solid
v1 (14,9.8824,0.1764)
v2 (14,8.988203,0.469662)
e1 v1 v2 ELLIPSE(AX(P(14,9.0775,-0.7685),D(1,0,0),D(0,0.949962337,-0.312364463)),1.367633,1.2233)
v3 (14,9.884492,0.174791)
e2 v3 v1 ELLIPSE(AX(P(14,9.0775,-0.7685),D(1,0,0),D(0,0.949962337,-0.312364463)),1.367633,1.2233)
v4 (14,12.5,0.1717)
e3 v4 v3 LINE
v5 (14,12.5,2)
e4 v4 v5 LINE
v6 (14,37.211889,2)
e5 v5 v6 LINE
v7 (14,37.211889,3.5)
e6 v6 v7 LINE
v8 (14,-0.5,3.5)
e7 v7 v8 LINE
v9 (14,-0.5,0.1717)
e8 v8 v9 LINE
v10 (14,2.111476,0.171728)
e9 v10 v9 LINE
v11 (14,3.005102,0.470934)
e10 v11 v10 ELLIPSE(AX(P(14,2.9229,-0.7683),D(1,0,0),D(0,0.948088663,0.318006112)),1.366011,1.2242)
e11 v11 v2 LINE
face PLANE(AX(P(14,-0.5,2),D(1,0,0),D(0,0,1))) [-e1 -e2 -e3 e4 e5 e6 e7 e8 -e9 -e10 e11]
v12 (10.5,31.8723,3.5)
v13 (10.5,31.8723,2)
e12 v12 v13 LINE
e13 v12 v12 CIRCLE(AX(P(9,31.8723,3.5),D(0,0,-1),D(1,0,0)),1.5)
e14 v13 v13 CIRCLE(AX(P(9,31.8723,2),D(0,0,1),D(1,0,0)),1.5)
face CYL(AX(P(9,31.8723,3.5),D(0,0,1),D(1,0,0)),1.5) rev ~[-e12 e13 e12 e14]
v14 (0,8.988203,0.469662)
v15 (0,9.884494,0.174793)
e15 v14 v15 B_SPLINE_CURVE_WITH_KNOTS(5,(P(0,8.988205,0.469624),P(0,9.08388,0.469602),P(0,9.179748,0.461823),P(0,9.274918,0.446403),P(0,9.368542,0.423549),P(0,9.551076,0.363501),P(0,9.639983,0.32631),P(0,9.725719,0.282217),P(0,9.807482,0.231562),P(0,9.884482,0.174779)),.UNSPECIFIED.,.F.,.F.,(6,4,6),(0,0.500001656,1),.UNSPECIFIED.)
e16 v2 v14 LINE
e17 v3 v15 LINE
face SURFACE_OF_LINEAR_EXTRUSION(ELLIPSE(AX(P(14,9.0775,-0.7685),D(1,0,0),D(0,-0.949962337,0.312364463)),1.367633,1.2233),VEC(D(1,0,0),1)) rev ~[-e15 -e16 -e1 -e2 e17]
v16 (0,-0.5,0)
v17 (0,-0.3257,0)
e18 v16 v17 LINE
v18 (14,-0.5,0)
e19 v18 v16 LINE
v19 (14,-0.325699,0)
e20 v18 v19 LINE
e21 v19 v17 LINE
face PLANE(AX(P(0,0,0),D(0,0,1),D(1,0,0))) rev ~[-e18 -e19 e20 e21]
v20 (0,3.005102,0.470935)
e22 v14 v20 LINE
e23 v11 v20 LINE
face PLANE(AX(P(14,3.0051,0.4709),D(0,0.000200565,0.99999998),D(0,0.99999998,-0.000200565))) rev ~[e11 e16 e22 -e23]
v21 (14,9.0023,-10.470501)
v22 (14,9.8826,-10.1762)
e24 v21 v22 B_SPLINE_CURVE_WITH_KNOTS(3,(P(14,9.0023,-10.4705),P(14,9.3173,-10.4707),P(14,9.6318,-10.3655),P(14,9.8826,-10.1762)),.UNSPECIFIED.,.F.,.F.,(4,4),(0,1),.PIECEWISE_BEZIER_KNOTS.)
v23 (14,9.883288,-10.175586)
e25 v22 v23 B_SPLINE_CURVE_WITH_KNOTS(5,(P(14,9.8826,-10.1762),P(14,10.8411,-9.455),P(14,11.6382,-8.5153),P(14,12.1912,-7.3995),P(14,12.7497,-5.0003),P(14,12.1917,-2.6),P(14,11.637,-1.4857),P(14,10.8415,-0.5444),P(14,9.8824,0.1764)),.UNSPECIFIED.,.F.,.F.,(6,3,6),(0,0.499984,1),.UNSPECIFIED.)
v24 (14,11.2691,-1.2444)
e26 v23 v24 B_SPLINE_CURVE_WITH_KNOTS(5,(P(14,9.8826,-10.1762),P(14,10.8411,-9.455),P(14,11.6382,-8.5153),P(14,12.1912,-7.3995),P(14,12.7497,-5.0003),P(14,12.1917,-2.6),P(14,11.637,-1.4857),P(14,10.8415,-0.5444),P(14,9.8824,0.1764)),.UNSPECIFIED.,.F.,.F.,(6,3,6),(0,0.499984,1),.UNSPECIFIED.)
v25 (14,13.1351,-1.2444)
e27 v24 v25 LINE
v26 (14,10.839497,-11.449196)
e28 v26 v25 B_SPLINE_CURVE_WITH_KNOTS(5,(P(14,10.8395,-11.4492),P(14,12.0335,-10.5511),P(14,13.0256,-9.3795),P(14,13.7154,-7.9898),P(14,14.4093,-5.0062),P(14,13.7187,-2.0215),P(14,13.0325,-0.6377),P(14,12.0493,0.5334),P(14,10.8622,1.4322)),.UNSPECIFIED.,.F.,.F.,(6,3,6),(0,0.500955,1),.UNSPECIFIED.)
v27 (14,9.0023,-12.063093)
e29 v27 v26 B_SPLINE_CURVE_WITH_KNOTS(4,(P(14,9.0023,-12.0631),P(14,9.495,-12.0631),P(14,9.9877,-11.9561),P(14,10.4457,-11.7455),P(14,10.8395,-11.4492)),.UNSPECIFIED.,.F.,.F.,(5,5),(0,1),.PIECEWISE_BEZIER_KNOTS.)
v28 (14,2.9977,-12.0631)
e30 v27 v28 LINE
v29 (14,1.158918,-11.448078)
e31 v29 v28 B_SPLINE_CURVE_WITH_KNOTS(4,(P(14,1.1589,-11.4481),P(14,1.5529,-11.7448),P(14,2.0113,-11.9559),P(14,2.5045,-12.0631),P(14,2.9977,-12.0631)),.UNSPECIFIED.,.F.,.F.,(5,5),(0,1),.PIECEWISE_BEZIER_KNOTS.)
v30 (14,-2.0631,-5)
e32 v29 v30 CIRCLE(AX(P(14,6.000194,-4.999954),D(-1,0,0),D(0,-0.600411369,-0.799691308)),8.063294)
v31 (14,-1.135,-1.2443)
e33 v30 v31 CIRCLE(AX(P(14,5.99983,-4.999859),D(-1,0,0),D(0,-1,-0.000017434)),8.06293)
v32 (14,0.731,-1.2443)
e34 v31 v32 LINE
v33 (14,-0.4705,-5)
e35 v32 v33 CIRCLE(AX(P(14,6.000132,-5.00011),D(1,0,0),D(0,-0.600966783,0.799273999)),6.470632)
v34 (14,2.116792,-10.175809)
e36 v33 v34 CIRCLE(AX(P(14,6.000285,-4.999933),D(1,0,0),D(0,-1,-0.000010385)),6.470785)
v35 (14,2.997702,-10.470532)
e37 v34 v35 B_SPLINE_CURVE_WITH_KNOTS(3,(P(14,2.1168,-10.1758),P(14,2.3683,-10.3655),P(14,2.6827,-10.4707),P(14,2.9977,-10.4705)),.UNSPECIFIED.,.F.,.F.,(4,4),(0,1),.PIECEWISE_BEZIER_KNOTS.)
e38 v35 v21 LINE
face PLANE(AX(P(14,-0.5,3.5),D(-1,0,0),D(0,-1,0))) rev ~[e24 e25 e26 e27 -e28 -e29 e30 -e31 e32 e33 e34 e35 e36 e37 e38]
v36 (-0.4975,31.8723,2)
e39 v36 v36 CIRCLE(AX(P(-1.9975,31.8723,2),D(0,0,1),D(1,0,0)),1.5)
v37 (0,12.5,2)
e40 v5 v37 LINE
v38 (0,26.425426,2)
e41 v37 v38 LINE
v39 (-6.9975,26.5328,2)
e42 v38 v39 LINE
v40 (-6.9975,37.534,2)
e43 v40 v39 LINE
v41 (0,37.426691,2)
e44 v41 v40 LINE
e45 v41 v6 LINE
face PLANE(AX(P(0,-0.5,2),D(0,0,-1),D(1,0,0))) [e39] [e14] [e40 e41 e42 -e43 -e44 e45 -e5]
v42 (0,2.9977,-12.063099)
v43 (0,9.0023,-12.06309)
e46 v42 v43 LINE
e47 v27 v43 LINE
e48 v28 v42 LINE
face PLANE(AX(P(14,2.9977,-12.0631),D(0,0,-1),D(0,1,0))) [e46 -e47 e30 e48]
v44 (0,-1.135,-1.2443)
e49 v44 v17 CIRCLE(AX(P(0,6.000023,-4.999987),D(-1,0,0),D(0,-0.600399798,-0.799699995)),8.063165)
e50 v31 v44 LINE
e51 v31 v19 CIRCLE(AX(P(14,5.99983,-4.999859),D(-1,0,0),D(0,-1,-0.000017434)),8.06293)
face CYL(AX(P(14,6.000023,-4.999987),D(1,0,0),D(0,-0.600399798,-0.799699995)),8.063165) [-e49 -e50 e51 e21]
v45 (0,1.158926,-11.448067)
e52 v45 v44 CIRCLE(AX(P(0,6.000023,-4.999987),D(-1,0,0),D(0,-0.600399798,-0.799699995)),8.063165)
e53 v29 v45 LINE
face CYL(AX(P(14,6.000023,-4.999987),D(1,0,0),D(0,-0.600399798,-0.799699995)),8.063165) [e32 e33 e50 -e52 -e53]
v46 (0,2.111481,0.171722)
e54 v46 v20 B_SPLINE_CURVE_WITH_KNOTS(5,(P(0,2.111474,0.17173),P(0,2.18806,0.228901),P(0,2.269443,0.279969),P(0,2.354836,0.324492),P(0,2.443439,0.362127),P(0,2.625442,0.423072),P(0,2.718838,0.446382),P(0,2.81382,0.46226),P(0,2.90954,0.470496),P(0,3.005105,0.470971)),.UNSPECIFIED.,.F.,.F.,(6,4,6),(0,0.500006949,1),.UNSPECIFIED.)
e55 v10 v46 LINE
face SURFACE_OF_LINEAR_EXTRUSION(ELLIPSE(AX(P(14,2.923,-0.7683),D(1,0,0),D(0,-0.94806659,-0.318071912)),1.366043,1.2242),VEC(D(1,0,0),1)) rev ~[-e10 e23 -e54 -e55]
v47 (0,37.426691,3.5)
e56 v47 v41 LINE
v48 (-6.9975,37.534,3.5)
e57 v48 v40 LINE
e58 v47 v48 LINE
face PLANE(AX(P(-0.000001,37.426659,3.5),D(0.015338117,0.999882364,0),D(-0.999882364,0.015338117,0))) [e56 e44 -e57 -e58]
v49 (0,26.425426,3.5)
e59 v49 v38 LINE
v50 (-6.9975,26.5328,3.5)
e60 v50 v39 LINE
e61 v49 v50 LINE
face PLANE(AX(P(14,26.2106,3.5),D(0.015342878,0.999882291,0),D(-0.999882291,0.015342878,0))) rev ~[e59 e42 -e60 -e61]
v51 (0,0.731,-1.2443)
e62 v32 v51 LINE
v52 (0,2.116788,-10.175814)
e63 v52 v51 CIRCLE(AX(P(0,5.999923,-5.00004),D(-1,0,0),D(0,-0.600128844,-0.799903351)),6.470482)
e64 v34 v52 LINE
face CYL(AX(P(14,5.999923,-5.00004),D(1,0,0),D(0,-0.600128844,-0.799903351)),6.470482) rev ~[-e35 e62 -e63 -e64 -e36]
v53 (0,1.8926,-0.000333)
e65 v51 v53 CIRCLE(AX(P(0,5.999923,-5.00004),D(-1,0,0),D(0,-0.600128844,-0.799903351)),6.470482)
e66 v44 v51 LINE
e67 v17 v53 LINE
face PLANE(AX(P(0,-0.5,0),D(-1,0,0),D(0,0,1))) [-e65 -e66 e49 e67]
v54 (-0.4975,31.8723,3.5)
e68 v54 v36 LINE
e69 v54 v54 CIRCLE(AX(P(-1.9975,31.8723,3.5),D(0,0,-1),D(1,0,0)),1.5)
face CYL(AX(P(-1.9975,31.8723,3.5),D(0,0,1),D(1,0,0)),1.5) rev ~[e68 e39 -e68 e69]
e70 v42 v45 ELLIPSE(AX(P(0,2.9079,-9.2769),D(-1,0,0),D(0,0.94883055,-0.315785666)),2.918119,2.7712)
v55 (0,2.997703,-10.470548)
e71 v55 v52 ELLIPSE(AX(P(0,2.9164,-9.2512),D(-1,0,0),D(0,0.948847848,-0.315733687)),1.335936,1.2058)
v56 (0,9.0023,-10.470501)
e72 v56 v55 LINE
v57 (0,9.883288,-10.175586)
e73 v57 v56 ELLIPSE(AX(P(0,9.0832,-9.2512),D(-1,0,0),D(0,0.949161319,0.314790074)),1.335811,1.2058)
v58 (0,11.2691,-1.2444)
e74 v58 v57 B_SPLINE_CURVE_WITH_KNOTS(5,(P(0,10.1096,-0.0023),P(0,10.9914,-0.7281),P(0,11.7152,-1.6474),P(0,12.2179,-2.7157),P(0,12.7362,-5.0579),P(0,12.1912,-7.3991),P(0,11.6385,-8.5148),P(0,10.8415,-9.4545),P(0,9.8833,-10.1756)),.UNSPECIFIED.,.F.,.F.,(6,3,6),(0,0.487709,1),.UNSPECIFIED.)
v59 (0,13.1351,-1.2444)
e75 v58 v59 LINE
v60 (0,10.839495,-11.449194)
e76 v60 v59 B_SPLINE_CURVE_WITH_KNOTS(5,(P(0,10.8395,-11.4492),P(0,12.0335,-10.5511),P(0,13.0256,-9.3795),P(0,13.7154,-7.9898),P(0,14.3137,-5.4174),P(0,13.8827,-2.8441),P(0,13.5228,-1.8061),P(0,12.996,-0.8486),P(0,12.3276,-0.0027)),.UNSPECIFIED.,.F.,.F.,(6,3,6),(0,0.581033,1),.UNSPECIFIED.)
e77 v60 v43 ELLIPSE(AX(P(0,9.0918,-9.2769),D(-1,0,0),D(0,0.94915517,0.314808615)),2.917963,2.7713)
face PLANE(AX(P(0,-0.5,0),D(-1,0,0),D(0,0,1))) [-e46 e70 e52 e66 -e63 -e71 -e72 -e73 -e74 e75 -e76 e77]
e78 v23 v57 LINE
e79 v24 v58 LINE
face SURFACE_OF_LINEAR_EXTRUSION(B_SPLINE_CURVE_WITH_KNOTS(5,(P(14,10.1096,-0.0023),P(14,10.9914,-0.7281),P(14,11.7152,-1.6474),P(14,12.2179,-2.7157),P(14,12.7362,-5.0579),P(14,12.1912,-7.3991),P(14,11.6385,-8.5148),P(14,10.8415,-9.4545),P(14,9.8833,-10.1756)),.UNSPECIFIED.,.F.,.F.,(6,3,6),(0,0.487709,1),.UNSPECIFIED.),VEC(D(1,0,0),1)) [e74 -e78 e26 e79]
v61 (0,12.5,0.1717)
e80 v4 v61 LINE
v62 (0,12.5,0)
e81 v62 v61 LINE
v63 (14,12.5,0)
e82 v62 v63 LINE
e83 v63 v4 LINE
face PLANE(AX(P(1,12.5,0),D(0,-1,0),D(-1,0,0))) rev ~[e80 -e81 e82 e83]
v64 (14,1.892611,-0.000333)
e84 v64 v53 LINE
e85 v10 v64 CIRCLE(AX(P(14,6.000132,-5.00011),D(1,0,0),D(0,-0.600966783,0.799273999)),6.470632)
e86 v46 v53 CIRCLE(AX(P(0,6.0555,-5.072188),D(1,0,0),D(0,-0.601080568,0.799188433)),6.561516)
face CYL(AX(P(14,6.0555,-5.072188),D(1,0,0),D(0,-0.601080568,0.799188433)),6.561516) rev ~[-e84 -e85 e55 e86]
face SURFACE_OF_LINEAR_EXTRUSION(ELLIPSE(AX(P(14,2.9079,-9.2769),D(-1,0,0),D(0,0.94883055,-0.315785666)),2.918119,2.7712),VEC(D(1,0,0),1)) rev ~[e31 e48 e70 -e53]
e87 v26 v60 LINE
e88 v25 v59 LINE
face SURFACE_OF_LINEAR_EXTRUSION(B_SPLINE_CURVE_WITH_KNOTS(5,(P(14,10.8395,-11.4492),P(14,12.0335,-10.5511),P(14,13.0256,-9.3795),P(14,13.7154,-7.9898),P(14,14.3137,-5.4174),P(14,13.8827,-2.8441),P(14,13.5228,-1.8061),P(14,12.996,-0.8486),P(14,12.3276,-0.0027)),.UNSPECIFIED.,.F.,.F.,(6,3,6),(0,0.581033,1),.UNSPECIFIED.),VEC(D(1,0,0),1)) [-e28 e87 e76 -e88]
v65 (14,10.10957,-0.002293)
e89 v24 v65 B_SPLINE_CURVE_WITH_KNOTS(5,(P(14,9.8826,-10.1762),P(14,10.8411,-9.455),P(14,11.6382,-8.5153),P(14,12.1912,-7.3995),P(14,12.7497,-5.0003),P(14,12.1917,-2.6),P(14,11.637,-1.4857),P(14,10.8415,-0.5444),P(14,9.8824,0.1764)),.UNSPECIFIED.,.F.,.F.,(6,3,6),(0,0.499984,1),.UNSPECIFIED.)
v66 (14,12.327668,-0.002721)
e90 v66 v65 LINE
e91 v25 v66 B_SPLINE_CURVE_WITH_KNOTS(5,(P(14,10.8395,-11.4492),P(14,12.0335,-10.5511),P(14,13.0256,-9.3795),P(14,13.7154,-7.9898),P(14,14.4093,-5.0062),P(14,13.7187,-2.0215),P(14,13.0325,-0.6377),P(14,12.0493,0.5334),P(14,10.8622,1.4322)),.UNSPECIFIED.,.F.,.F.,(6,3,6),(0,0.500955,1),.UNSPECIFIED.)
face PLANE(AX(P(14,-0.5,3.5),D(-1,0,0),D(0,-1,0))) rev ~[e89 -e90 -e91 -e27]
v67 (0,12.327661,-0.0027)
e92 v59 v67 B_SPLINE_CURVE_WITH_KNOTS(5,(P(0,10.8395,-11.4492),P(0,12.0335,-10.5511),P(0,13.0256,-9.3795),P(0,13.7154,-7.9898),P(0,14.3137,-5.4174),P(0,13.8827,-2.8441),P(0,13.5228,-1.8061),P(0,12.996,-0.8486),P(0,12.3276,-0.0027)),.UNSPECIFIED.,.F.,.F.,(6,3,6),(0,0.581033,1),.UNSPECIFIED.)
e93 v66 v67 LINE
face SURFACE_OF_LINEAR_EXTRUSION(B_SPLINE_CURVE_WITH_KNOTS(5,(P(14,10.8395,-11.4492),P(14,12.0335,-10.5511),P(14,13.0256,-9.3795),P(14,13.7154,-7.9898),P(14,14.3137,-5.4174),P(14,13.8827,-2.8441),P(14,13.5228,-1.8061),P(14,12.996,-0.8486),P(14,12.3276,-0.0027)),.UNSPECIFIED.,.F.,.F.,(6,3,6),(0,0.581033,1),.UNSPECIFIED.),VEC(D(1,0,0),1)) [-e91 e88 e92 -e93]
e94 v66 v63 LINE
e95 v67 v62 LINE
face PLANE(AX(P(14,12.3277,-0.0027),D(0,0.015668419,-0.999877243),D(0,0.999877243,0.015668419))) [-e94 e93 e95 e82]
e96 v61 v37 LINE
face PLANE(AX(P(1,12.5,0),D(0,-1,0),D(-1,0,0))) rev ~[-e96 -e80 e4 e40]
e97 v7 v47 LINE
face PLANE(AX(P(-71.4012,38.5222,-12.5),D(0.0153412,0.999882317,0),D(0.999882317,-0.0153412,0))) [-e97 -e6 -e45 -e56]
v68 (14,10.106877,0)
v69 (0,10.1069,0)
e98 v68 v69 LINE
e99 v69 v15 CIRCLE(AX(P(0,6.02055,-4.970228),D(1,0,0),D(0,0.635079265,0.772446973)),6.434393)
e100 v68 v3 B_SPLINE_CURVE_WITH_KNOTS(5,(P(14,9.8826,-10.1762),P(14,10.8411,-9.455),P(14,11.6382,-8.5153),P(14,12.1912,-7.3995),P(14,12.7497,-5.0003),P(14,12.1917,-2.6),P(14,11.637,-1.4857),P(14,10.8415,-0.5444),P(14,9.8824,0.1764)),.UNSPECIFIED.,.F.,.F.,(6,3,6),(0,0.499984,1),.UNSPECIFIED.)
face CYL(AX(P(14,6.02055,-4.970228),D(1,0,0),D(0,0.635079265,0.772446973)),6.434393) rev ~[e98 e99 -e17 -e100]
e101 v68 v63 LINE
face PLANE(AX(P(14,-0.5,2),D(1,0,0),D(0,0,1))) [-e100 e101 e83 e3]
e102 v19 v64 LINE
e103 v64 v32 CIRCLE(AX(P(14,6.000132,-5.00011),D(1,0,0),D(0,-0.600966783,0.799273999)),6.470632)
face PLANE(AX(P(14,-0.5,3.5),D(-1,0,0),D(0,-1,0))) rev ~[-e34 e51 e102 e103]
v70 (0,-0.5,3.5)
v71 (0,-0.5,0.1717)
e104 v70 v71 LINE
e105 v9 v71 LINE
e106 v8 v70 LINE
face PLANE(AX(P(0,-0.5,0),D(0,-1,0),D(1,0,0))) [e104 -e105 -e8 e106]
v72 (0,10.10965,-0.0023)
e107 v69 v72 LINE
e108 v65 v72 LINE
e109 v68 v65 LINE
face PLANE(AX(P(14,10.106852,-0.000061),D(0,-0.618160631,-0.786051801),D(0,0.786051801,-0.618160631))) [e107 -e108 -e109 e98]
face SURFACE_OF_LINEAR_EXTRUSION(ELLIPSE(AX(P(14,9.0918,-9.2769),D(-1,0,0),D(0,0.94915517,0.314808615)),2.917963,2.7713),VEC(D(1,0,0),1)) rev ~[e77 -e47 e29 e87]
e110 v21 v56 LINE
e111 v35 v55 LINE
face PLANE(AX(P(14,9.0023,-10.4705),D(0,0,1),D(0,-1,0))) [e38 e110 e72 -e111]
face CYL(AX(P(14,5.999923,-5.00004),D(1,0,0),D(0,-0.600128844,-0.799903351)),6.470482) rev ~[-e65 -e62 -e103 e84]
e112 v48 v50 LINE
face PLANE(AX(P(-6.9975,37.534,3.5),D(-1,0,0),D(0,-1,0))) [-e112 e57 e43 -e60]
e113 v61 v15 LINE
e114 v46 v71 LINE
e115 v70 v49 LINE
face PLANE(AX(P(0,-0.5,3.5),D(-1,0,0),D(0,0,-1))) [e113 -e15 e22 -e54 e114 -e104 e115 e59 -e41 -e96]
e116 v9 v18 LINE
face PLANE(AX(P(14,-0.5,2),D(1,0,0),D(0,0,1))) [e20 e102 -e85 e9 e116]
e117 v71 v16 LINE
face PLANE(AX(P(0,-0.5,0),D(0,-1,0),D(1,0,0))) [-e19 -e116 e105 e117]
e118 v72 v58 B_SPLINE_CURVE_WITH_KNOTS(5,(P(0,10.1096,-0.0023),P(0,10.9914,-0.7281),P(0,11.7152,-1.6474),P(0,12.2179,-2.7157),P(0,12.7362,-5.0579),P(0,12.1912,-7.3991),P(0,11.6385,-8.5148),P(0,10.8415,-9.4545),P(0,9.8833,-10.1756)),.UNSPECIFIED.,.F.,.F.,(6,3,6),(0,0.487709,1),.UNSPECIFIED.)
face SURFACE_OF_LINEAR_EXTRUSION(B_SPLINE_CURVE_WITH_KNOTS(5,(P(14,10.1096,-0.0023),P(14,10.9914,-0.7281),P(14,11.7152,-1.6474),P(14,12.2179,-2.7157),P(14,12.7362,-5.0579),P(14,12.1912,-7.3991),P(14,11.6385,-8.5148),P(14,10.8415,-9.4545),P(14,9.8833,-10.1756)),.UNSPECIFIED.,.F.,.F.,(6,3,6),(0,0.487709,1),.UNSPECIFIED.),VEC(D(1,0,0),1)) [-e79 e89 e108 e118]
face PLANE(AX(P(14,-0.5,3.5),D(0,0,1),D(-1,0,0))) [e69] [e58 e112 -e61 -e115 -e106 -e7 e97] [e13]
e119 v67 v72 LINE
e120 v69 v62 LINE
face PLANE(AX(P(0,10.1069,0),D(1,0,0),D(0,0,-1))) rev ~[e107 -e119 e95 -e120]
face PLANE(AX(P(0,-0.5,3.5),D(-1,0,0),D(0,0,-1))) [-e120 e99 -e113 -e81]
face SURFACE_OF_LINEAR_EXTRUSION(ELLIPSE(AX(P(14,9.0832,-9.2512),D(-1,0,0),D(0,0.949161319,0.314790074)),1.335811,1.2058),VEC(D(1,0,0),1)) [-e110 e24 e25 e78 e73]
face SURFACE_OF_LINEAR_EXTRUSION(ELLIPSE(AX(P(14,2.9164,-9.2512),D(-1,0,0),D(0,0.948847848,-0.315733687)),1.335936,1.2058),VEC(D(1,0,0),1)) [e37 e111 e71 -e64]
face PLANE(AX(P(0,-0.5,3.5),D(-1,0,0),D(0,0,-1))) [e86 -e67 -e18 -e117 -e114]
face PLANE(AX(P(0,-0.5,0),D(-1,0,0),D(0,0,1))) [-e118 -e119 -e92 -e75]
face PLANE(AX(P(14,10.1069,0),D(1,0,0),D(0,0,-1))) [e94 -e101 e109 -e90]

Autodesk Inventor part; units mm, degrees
ref_plane "YZ Plane" through (0, 0, 0) normal (1, 0, 0) x (0, 1, 0)
ref_plane "XZ Plane" through (0, 0, 0) normal (0, 1, 0) x (-1, 0, 0)
sketch "Sketch1" plane through (0, 0, 0) normal (0, 0, 1) x (1, 0, 0)
  line L0 (1, 9) -> (14, 9) projected
  line L1 (1, 3) -> (1, 9) projected
  line L2 (14, 3) -> (1, 3) projected
  line L3 (14, 9) -> (14, 3) projected
  line L4 (1, 12) -> (14, 12)
  line L5 (1, 0) -> (14, 0)
  line L6 (1, 12.5) -> (14, 12.5)
  line L7 (1, -0.5) -> (14, -0.5)
  line L8 (0, 1.4) -> (0, 10.6) projected
  line L9 (0, -0.5) -> (14, -0.5)
  line L10 (14, -0.5) -> (14, 12.5)
  line L11 (14, 12.5) -> (0, 12.5)
  line L12 (0, 12.5) -> (0, -0.5)
  point P0 (0, 0)
  dimension "d0" = 0.5
  dimension "d1" = 0.5
extrude "Extrusion1" add sketch "Sketch1" along normal blind 2
sketch "Sketch2" plane through (14, -0.5, 0) normal (1, 0, 0) x (0, 0, -1)
  line L0 (10, 9.5) -> (10, 3.5) projected
  line L1 (10.5, 9.5) -> (10.5, 3.5)
  line L2 (0, 13) -> (0, 0) projected
  line L3 (0.0028, 13) -> (0, 0)
  arc A0 (5, 0.5) -> (9.8, 2.9) centre (5, 6.5) ccw projected
  spline S0 degree 3 poles (9.8, 10.1) (9.3822, 10.6561) (8.439, 11.5426) (6.738, 12.3306) (5.0002, 12.5848) (3.2616, 12.3308) (1.5615, 11.5422) (0.6175, 10.6564) (0.2, 10.1) knots 0.000048 0.000048 0.000048 0.000048 1.982593 3.634064 5.285536 6.937008 8.58848 10.571071 10.571071 10.571071 10.571071 weights 1 1 1 1 1 1 1 1 1 projected
  arc A1 (0.2, 2.9) -> (5, 0.5) centre (5, 6.5) ccw projected
  ellipse E0 centre (0.7683, 3.4229) end of major axis (0.4925, 4.2518) minor radius 0.7558 (0, 3.5) -> (0.2, 2.9) ccw projected
  ellipse E1 centre (0.7685, 9.5775) end of major axis (1.0457, 10.4061) minor radius 0.7558 (0.2, 10.1) -> (0, 9.5) ccw projected
  ellipse E2 centre (9.2317, 3.4229) end of major axis (9.5075, 4.2518) minor radius 0.7558 (9.8, 2.9) -> (10, 3.5) ccw projected
  ellipse E3 centre (9.2318, 9.5768) end of major axis (8.9568, 10.4058) minor radius 0.7558 (10, 9.5) -> (9.7999, 10.1) ccw projected
  arc A2 (5, 0.0295) -> (10.1758, 2.6168) centre (5, 6.5) ccw
  arc A3 (-0.1717, 2.6115) -> (5, 0.0295) centre (5, 6.5) ccw
  line L4 (10.4705, 3.4977) -> (10.4705, 9.5023)
  ellipse E4 centre (0.7683, 3.4229) end of major axis (0.3339, 4.718) minor radius 1.2242 (-0.4709, 3.5051) -> (-0.1717, 2.6115) ccw
  ellipse E5 centre (0.7685, 9.5775) end of major axis (1.1957, 10.8767) minor radius 1.2233 (-0.1748, 10.3845) -> (-0.4697, 9.4882) ccw
  arc A4 (0.2, 2.9) -> (9.8, 2.9) centre (5, 6.5) ccw projected
  arc A5 (5, -1.5631) -> (11.4481, 1.6589) centre (5, 6.5) ccw
  arc A6 (-1.4235, 1.6263) -> (5, -1.5631) centre (5, 6.5) ccw
  line L5 (12.0631, 3.4977) -> (12.0631, 9.5023)
  ellipse E6 centre (0.7683, 3.4229) end of major axis (-0.2657, 6.5587) minor radius 2.7801 (-2.0629, 3.5774) -> (-1.4235, 1.6263) ccw
  ellipse E7 centre (0.7685, 9.5775) end of major axis (1.7896, 12.7173) minor radius 2.7798 (-1.4322, 11.3622) -> (-2.0617, 9.4138) ccw
  line L6 (-0.4709, 3.5051) -> (-0.4697, 9.4882)
  line L7 (-2.0629, 3.5774) -> (-2.0617, 9.4138)
  spline S1 degree 5 poles (10.1762, 10.3826) (9.455, 11.3411) (8.5153, 12.1382) (7.3995, 12.6912) (5.0003, 13.2497) (2.6, 12.6917) (1.4857, 12.137) (0.5444, 11.3415) (-0.1764, 10.3824) knots 0 0 0 0 0 0 0.499984 0.499984 0.499984 1 1 1 1 1 1
  spline S2 degree 3 poles (10.1759, 2.6167) (10.3655, 2.8683) (10.4707, 3.1827) (10.4707, 3.4977) knots 0 0 0 0 1 1 1 1
  spline S3 degree 3 poles (10.4707, 9.5023) (10.4707, 9.8173) (10.3655, 10.1318) (10.1757, 10.3833) knots 0 0 0 0 1 1 1 1
  spline S4 degree 4 poles (11.4481, 1.6589) (11.7448, 2.0529) (11.9559, 2.5113) (12.0631, 3.0045) (12.0631, 3.4977) knots 0 0 0 0 0 1 1 1 1 1
  spline S5 degree 4 poles (12.0631, 9.5023) (12.0631, 9.995) (11.9561, 10.4877) (11.7455, 10.9457) (11.4492, 11.3395) knots 0 0 0 0 0 1 1 1 1 1
  spline S6 degree 5 poles (11.4495, 11.3391) (10.5511, 12.5335) (9.3795, 13.5256) (7.9898, 14.2154) (5.0062, 14.9093) (2.0215, 14.2187) (0.6377, 13.5325) (-0.5334, 12.5493) (-1.4322, 11.3622) knots 0 0 0 0 0 0 0.500955 0.500955 0.500955 1 1 1 1 1 1
  point P0 (0, 0.5)
  point P1 (0, 10.6069)
  point P2 (0, 12.8255)
  point P3 (0, 0.1744)
  point P4 (0, 2.393)
  point P5 (0.0005, 2.3924)
  point P6 (0, 0.1743)
  point P7 (0.0027, 12.8276)
  point P8 (0.0023, 10.6096)
extrude "Extrusion2" add sketch "Sketch2" along normal blind 2 contours L3 S6 S5 L5 S4 A5 A6 L2 A3 A2 S2 L4 S3 S1 | S1 E5 L6 E4 A3 L2 A6 E6 L7 E7 S6
sketch "Sketch3" plane through (14, 1.893, 0) normal (1, 0, 0) x (0, 0, -1)
  arc A0 (-0.1717, 0.2185) -> (0, 0) centre (5, 4.107) ccw projected
  line L0 (0, 0) -> (0, 8.2139) projected
  arc A1 (0, 8.2139) -> (-0.1748, 7.9915) centre (4.9785, 4.1209) ccw projected
  ellipse E0 centre (0.7685, 7.1845) end of major axis (0.3413, 5.8853) minor radius 1.2233 (-0.1748, 7.9915) -> (-0.4697, 7.0952) ccw projected
  line L1 (-0.4697, 7.0952) -> (-0.4709, 1.1121) projected
  ellipse E1 centre (0.7683, 1.03) end of major axis (1.2028, -0.2651) minor radius 1.2242 (-0.4709, 1.1121) -> (-0.1717, 0.2185) ccw projected
  point P0 (0, -1.893)
extrude "Extrusion3" cut sketch "Sketch3" against normal through all
sketch "Sketch4" plane through (14, -0.5, 0) normal (-1, 0, 0) x (0, 0, 1)
  line L0 (-10.4705, 9.5023) -> (-10.4705, 3.4977) projected
  ellipse E0 centre (-9.2512, 9.5832) end of major axis (-8.8307, 10.8511) minor radius 1.2058 (-10.1756, 10.3833) -> (-10.4705, 9.5023) ccw projected
  spline S0 degree 5 poles (-0.0023, 10.6096) (-0.7281, 11.4914) (-1.6474, 12.2152) (-2.7157, 12.7179) (-5.0579, 13.2362) (-7.3991, 12.6912) (-8.5148, 12.1385) (-9.4545, 11.3415) (-10.1756, 10.3833) knots 0 0 0 0 0 0 0.487709 0.487709 0.487709 1 1 1 1 1 1 projected
  line L1 (-0.0027, 12.8276) -> (-0.0023, 10.6096) projected
  spline S1 degree 5 poles (-11.4492, 11.3395) (-10.5511, 12.5335) (-9.3795, 13.5256) (-7.9898, 14.2154) (-5.4174, 14.8137) (-2.8441, 14.3827) (-1.8061, 14.0228) (-0.8486, 13.496) (-0.0027, 12.8277) knots 0 0 0 0 0 0 0.581033 0.581033 0.581033 1 1 1 1 1 1 projected
  ellipse E1 centre (-9.2769, 9.5918) end of major axis (-8.3583, 12.3614) minor radius 2.7713 (-11.4492, 11.3395) -> (-12.0631, 9.5023) ccw projected
  line L2 (-12.0631, 3.4977) -> (-12.0631, 9.5023) projected
  ellipse E2 centre (-9.2769, 3.4079) end of major axis (-10.1984, 6.1767) minor radius 2.7712 (-12.0631, 3.4977) -> (-11.4481, 1.6589) ccw projected
  arc A0 (-11.4481, 1.6589) -> (0, 0.1743) centre (-5, 6.5) ccw projected
  line L3 (-0.0005, 2.3924) -> (0, 0.1743) projected
  arc A1 (-10.1758, 2.6168) -> (-0.0005, 2.3924) centre (-5, 6.5) ccw projected
  ellipse E3 centre (-9.2512, 3.4164) end of major axis (-9.673, 4.684) minor radius 1.2058 (-10.4705, 3.4977) -> (-10.1758, 2.6168) ccw projected
  point P0 (0, 0.5)
extrude "Extrusion4" add sketch "Sketch4" along normal up to surface (14 mm away)
sketch "Sketch5" plane through (0, -0.5, 0) normal (0, -1, 0) x (1, 0, 0)
  line L0 (0, 2) -> (14, 2) projected
  line L1 (0, 2) -> (14, 2)
  line L2 (14, 2) -> (14, 3.5)
  line L3 (14, 3.5) -> (0, 3.5)
  line L4 (0, 3.5) -> (0, 2)
  point P0 (0, 0)
  dimension "d22" = 1.5
ref_plane "Work Plane1" through (-71.4012, 38.5222, -12.5) normal (0.0153412, 0.9998823, 0) x (0, 0, 1)
extrude "Extrusion5" add sketch "Sketch5" against normal up to surface surface through (-71.4012, 38.5222, -12.5) normal (0.0153412, 0.9998823, 0)
sketch "Sketch6" plane through (0, -0.5, 3.5) normal (0, 0, 1) x (1, 0, 0)
  line L0 (14, 0) -> (14, 37.7119) projected
  line L1 (14, 37.7119) -> (0, 37.9267) projected
  line L2 (-54.2389, 27.7576) -> (-67.6625, 27.9635) projected
  line L3 (14, 37.7119) -> (14, 26.7106)
  line L4 (14, 13) -> (14, 37.7119) projected
  line L5 (14, 26.7106) -> (-6.9975, 27.0328)
  line L6 (14, 37.7119) -> (-6.9975, 38.034)
  line L7 (-6.9975, 38.034) -> (-6.9975, 27.0328)
  point P0 (0, 0.5)
  point P1 (4.9084, 26.8501)
  dimension "d25" = 21
  dimension "d26" = 21
extrude "Extrusion6" add sketch "Sketch6" against normal blind 1.5
sketch "Sketch7" plane through (0, -0.5, 3.5) normal (0, 0, 1) x (1, 0, 0)
  line L0 (14, 0) -> (14, 37.7119) projected
  line L1 (14, -3.9463) -> (21.7341, -3.9463)
  line L2 (21.7341, -3.9463) -> (21.7341, 19.3789)
  line L3 (21.7341, 19.3789) -> (14, 19.3789)
  line L4 (14, 19.3789) -> (14, -3.9463)
  point P0 (0, 0.5)
extrude "Extrusion7" cut sketch "Sketch7" against normal blind 15.75
sketch "Sketch8" plane through (14, 10.1069, 0) normal (1, 0, 0) x (0, 0, -1)
  ellipse E0 centre (9.2512, -1.0236) end of major axis (8.8307, 0.2442) minor radius 1.2058 (10.4705, -1.1046) -> (10.1756, -0.2236) ccw projected
  line L0 (10.4705, -7.1091) -> (10.4705, -1.1046) projected
  ellipse E1 centre (9.2512, -7.1904) end of major axis (9.673, -5.9229) minor radius 1.2058 (10.1758, -7.9901) -> (10.4705, -7.1091) ccw projected
  arc A0 (0.0005, -8.2145) -> (10.1758, -7.9901) centre (5, -4.1069) ccw projected
  line L1 (0, -10.4326) -> (0.0005, -8.2145) projected
  arc A1 (0, -10.4326) -> (11.4481, -8.948) centre (5, -4.1069) ccw projected
  ellipse E2 centre (9.2769, -7.199) end of major axis (10.1984, -4.4302) minor radius 2.7712 (11.4481, -8.948) -> (12.0631, -7.1091) ccw projected
  line L2 (12.0631, -1.1046) -> (12.0631, -7.1091) projected
  ellipse E3 centre (9.2769, -1.0151) end of major axis (8.3583, 1.7545) minor radius 2.7713 (12.0631, -1.1046) -> (11.4492, 0.7326) ccw projected
  spline S0 degree 5 poles (0.0027, 2.2208) (0.8486, 2.8891) (1.8061, 3.4159) (2.8441, 3.7759) (5.4174, 4.2068) (7.9898, 3.6085) (9.3795, 2.9188) (10.5511, 1.9266) (11.4492, 0.7326) knots 0 0 0 0 0 0 0.418967 0.418967 0.418967 1 1 1 1 1 1 projected
  line L3 (0.0023, 0.0028) -> (0.0027, 2.2208) projected
  spline S1 degree 5 poles (10.1756, -0.2236) (9.4545, 0.7346) (8.5148, 1.5316) (7.3991, 2.0844) (5.0579, 2.6294) (2.7157, 2.111) (1.6474, 1.6084) (0.7281, 0.8845) (0.0023, 0.0027) knots 0 0 0 0 0 0 0.512291 0.512291 0.512291 1 1 1 1 1 1 projected
  arc A2 (-0.1717, -7.9954) -> (0, -8.2139) centre (5, -4.1069) ccw projected
  ellipse E4 centre (0.7683, -7.184) end of major axis (1.2028, -8.479) minor radius 1.2242 (-0.4709, -7.1018) -> (-0.1717, -7.9954) ccw projected
  ellipse E5 centre (0.7685, -1.0294) end of major axis (0.3413, -2.3286) minor radius 1.2233 (-0.1748, -0.2224) -> (-0.4697, -1.1187) ccw projected
  arc A3 (0, 0) -> (-0.1748, -0.2224) centre (4.9785, -4.093) ccw projected
  line L4 (-0.4697, -1.1187) -> (-0.4709, -7.1018) projected
  line L5 (0, 0) -> (0, 2.3931) projected
  line L6 (0, 2.3931) -> (-2, 2.3931) projected
  line L7 (0, -10.6069) -> (0, -8.2139) projected
  line L8 (0, -10.6069) -> (-3.5, -10.6069) projected
  line L9 (1.2443, -11.2419) -> (1.2443, -9.3759)
  arc A4 (0.0005, -8.2145) -> (10.1758, -7.9901) centre (5, -4.1069) ccw projected
  arc A5 (0.0005, -8.2145) -> (1.2443, -9.3759) centre (4.9979, -4.1091) ccw
  line L10 (0, -8.2139) -> (-0.1717, -7.9954)
  ellipse E6 centre (0.7683, -7.184) end of major axis (1.2028, -8.479) minor radius 1.2242 (-0.4709, -7.1018) -> (-0.1717, -7.9954) ccw projected
  line L11 (-0.1717, -7.9954) -> (-0.1717, -10.6069)
  line L12 (0, -10.6069) -> (-0.1717, -10.6069)
  line L13 (0, -10.6069) -> (0, -10.4326)
  arc A6 (0, -10.4326) -> (1.2443, -11.2419) centre (5, -4.1069) ccw
  line L14 (1.2444, 1.1622) -> (1.2444, 3.0282)
  arc A7 (1.2444, 3.0282) -> (0.0027, 2.2208) centre (4.9892, -4.0883) ccw
  line L15 (0, 2.3931) -> (0, 0) projected
  line L16 (0.0027, 2.2208) -> (0, 2.3931)
  line L17 (0, 2.3931) -> (-0.1717, 2.3931)
  line L18 (-0.1717, 2.3931) -> (-0.1748, -0.2224)
  line L19 (-0.1748, -0.2224) -> (0.0023, 0.0028)
  line L20 (0.0005, -8.2145) -> (0, -8.2139)
  point P0 (0, -10.1069)
extrude "Extrusion8" add sketch "Sketch8" against normal up to surface (14 mm away) contours S1 L3 S0 L14 | L19 L5 L16 L3 | L9 A1 L1 A0 | A3 L18 L6 L5 | L1 L7 L8 L11 A2
sketch "Sketch9" plane through (0, -0.5, 3.5) normal (0, 0, 1) x (1, 0, 0)
  line L0 (0, 0) -> (0, 26.9254) projected
  line L1 (14, 0) -> (0, 0) projected
  line L2 (14, 0) -> (14, 37.7119) projected
  line L3 (14, 37.7119) -> (-6.9975, 38.034) projected
  line L4 (-6.9975, 38.034) -> (-6.9975, 27.0328) projected
  line L5 (-6.9975, 27.0328) -> (0, 26.9254) projected
  line L6 (-6.9975, 38.034) -> (14, 37.7119) projected
  line L7 (-6.9975, 38.034) -> (14, 26.7132)
  line L8 (14, 13) -> (14, 37.7119) projected
  line L9 (14, 37.7119) -> (-6.9975, 27.0328)
  line L10 (-6.9975, 38.034) -> (-6.9975, 27.0328) projected
  line L11 (-6.9975, 32.3723) -> (14, 32.3723)
  line L12 (-6.9975, 32.3723) -> (0.0025, 32.3723)
  line L13 (14, 32.3723) -> (7, 32.3723)
  line L14 (-6.9975, 32.3723) -> (-1.9975, 32.3723)
  line L15 (14, 32.3723) -> (9, 32.3723)
  circle A0 centre (-1.9975, 32.3723) radius 1.5
  circle A1 centre (9, 32.3723) radius 1.5
  point P0 (0, 0.5)
  dimension "d35" = 5
  dimension "d36" = 5
  dimension "d37" = 3
  dimension "d38" = 3
extrude "Extrusion9" cut sketch "Sketch9" against normal blind 3 contours A0 L11 | L11 A0 | A1 L11 | L11 A1
equation "\"d39\" = d37"
properties part number "leftWheeler_3DPrint"
